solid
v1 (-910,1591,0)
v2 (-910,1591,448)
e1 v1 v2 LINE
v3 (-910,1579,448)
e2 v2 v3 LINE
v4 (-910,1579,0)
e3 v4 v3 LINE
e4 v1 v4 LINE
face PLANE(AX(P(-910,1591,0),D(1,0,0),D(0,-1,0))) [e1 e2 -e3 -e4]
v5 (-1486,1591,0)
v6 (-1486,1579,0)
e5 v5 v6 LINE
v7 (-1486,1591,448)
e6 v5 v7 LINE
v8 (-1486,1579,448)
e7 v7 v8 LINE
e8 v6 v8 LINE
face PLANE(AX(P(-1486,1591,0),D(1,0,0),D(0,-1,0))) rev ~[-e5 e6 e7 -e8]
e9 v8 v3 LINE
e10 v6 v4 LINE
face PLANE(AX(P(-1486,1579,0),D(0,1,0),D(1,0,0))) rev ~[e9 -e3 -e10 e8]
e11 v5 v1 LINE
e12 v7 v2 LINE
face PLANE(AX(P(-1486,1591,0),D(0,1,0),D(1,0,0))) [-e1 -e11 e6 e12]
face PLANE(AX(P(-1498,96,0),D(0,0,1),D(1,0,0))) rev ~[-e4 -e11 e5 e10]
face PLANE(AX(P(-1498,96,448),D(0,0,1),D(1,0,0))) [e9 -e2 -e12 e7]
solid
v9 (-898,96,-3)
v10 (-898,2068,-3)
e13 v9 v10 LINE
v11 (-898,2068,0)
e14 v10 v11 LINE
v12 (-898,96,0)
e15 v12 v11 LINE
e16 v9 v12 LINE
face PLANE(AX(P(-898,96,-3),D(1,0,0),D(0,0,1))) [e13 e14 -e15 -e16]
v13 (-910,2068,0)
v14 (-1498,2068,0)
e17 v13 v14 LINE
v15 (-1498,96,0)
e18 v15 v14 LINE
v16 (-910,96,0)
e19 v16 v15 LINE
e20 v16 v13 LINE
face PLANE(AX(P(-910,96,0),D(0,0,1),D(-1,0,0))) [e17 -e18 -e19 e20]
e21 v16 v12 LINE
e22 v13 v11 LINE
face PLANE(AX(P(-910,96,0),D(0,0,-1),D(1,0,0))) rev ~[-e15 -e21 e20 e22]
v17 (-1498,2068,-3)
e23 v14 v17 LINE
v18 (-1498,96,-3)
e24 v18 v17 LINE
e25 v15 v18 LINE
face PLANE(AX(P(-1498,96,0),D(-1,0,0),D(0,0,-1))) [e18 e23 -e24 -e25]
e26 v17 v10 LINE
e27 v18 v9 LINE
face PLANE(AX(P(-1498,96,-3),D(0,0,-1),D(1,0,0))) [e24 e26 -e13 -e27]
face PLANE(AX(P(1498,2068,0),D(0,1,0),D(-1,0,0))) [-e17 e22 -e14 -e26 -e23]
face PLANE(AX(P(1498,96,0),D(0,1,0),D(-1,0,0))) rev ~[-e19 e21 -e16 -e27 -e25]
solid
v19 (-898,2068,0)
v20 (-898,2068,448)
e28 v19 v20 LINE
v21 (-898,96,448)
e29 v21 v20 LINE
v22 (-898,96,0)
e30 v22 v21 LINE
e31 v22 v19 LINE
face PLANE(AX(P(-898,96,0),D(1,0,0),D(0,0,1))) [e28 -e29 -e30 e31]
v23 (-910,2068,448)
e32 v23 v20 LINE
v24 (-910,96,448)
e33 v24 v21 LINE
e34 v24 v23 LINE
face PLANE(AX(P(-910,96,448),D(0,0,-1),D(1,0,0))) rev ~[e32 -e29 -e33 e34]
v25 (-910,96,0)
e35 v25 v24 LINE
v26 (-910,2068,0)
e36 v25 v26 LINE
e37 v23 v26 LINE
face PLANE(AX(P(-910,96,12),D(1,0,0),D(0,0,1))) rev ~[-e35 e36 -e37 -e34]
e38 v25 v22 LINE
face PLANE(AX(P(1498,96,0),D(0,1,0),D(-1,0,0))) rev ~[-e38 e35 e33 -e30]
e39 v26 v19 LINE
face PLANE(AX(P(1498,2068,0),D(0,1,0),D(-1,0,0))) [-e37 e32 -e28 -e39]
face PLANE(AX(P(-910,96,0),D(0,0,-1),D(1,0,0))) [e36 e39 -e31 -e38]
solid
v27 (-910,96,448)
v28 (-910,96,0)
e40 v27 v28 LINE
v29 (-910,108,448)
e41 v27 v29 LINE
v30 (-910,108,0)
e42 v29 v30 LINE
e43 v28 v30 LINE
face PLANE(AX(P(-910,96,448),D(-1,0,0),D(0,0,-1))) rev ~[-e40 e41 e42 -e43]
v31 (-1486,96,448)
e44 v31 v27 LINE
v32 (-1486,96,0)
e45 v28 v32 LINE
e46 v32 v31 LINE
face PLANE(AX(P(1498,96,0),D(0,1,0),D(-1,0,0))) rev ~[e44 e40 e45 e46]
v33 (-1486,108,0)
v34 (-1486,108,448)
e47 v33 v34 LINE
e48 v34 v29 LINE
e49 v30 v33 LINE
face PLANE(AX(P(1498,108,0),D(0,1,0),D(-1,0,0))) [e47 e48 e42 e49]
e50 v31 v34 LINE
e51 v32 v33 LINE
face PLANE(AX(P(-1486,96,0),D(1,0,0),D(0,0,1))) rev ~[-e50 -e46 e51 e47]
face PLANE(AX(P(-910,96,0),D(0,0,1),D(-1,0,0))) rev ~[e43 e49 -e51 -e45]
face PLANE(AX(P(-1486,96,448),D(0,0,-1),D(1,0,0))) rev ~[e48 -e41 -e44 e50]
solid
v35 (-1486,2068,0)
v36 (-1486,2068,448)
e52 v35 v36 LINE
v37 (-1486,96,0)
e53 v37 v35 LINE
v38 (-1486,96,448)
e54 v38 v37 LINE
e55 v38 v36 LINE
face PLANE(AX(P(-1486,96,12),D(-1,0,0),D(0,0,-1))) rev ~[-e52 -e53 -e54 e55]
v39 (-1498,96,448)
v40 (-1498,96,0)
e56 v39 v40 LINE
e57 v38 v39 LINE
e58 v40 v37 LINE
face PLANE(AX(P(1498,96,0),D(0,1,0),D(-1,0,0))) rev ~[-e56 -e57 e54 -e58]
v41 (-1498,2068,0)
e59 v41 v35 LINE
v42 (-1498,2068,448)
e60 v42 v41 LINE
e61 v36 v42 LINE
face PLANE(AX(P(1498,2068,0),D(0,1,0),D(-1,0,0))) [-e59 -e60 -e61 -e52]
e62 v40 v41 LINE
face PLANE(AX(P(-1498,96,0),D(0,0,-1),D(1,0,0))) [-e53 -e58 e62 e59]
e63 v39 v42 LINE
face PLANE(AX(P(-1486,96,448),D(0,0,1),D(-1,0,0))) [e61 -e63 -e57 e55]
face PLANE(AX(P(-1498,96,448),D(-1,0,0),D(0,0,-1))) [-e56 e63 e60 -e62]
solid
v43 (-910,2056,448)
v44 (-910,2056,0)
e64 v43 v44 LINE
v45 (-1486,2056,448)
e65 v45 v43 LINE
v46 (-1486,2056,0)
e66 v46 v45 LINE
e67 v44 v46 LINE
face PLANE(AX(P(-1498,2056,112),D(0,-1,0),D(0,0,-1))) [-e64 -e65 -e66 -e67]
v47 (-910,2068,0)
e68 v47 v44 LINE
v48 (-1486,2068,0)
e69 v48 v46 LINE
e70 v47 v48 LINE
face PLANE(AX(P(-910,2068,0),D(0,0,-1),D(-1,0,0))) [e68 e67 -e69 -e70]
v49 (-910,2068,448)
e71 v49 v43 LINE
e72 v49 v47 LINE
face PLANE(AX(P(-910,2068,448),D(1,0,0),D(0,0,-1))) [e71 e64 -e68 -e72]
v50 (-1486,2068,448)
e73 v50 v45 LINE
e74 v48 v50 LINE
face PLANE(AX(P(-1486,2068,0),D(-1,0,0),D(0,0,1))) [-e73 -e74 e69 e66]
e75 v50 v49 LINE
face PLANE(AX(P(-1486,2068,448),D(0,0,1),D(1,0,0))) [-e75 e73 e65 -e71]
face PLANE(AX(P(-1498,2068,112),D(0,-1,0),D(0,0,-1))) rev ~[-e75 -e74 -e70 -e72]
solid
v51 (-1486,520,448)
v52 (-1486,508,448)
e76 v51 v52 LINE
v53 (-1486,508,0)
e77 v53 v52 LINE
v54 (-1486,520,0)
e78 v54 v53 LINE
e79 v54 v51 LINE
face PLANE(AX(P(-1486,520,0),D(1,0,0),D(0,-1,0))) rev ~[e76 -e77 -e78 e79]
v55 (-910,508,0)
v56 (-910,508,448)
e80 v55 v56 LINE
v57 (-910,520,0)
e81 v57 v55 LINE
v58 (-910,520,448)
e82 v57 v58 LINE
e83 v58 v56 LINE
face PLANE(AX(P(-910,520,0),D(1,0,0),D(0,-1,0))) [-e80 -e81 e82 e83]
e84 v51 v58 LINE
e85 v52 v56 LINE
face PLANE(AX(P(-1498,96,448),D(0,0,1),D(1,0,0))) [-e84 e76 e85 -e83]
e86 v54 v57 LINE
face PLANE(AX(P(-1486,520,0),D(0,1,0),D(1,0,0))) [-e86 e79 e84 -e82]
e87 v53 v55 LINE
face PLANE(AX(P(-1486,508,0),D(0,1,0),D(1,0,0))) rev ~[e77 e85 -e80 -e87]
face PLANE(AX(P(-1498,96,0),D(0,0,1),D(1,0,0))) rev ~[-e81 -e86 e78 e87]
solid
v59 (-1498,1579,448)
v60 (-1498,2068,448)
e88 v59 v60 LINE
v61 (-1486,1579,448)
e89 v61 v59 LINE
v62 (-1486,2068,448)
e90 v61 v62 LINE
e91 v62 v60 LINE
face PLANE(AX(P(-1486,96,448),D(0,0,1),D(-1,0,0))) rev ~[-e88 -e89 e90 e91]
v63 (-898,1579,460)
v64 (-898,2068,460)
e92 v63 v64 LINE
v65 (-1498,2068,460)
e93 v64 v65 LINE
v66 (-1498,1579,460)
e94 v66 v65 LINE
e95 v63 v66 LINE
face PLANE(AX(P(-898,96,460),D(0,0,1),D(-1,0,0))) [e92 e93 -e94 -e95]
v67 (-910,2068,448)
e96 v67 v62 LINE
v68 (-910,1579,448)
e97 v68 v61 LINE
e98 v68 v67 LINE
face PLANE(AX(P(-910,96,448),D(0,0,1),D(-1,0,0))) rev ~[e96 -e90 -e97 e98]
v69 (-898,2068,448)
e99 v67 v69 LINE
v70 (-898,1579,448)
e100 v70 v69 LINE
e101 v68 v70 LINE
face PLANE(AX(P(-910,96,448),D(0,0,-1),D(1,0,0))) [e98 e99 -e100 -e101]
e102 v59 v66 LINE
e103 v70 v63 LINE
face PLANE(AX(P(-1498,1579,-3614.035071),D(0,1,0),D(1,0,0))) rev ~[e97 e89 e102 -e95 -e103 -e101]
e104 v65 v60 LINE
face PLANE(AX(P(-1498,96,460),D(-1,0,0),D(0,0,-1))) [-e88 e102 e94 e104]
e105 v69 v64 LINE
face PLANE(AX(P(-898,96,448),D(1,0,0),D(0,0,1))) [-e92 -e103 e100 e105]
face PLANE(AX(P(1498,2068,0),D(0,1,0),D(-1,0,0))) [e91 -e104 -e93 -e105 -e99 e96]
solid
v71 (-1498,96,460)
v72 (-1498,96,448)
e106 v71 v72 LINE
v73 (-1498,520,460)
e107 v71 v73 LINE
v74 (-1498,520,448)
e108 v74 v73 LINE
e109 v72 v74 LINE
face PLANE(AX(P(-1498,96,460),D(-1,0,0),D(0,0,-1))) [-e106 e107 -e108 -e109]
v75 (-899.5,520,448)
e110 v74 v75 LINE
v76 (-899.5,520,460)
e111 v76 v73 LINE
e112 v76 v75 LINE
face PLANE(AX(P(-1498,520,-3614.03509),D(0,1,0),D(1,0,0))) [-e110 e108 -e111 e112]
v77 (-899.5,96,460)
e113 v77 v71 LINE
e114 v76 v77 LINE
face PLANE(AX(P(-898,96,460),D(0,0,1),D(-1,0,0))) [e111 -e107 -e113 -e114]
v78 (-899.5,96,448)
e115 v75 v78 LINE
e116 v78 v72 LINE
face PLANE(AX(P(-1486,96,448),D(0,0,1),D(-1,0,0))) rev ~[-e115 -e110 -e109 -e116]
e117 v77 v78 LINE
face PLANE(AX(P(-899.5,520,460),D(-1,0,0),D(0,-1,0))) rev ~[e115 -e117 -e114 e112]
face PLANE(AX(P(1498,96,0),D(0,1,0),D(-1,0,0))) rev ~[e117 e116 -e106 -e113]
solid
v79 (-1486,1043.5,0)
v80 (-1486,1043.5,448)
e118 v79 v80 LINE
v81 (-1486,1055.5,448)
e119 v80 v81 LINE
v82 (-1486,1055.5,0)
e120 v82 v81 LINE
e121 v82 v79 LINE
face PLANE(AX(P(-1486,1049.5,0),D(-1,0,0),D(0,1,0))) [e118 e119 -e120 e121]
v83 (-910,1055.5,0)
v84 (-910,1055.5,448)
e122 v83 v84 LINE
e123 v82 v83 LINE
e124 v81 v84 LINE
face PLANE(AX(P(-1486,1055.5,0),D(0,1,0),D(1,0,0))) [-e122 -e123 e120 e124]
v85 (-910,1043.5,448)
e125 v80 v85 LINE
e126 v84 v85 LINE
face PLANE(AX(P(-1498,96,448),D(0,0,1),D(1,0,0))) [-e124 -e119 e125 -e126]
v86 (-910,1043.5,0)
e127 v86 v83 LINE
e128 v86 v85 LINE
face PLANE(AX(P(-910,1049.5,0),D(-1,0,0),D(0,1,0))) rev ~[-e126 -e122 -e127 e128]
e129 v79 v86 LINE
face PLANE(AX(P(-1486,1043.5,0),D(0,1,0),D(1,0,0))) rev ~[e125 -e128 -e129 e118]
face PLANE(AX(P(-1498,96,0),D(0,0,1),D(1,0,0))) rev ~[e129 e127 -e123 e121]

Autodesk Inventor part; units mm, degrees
ref_plane "YZ Plane" through (0, 0, 0) normal (1, 0, 0) x (0, 1, 0)
sketch "Sketch1" plane through (0, 0, 0) normal (0, 0, 1) x (1, 0, 0)
  line L0 (-1498, 0) -> (1498, 0) construction
  line L1 (-1498, 0) -> (-898, 0)
  line L2 (-898, 0) -> (-898, 2068)
  line L3 (-898, 2068) -> (-1498, 2068)
  line L4 (-1498, 2068) -> (-1498, 0)
  line L5 (-898, 0) -> (-498, 0)
  line L6 (-498, 0) -> (-498, 816)
  line L7 (-498, 816) -> (-898, 816)
  line L8 (-898, 816) -> (-898, 0)
  line L9 (-498, 0) -> (102, 0)
  line L10 (102, 0) -> (102, 816)
  line L11 (102, 816) -> (-498, 816)
  line L12 (-498, 816) -> (-498, 0)
  line L13 (102, 0) -> (698, 0)
  line L14 (698, 0) -> (698, 668)
  line L15 (698, 668) -> (102, 668)
  line L16 (102, 668) -> (102, 0)
  line L17 (698, 0) -> (1498, 0)
  line L18 (1498, 0) -> (1498, 816)
  line L19 (1498, 816) -> (698, 816)
  line L20 (698, 816) -> (698, 0)
  line L21 (-1498, 0) -> (1498, 0)
  line L22 (1498, 0) -> (1498, 96)
  line L23 (1498, 96) -> (-1498, 96)
  line L24 (-1498, 96) -> (-1498, 0)
  line L25 (-898, 816) -> (1498, 816)
  line L26 (1498, 816) -> (1498, 832)
  line L27 (1498, 832) -> (-898, 832)
  line L28 (-898, 832) -> (-898, 816)
  line L29 (-898, 1972) -> (-498, 1972)
  line L30 (-498, 1972) -> (-498, 1372)
  line L31 (-498, 1372) -> (-898, 1372)
  line L32 (-898, 1372) -> (-898, 1972)
  line L33 (698, 1972) -> (1498, 1972)
  line L34 (1498, 1972) -> (1498, 1372)
  line L35 (1498, 1372) -> (698, 1372)
  line L36 (698, 1372) -> (698, 1972)
  line L37 (698, 1372) -> (98, 1372)
  line L38 (98, 1372) -> (98, 1972)
  line L39 (98, 1972) -> (698, 1972)
  line L40 (698, 1972) -> (698, 1372)
  line L41 (-498, 1372) -> (98, 1372)
  line L42 (-498, 1372) -> (-275, 1637.7611)
  line L43 (98, 1372) -> (-125, 1637.7611)
  line L44 (-275, 1637.7611) -> (-125, 1637.7611)
  line L45 (-125, 1637.7611) -> (-125, 2068)
  line L46 (-125, 2068) -> (-275, 2068)
  line L47 (-275, 2068) -> (-275, 1637.7611)
  line L48 (1098, 816) -> (1098, 96)
  line L49 (-198, 816) -> (-198, 96)
  line L50 (-898, 668) -> (-498, 668)
  line L51 (-1498, 520) -> (-898, 520)
  line L52 (-1498, 1579) -> (-898, 1579)
  line L53 (398, 1972) -> (398, 1372)
  line L54 (1098, 1972) -> (1098, 1372)
  line L55 (698, 1876) -> (1498, 1876)
  line L56 (698, 1468) -> (1498, 1468)
  line L57 (-1498, 1049.5) -> (-898, 1049.5)
  point P0 (0, 0)
  point P1 (0, 0)
  point P2 (0, 0)
  point P3 (1098, 816)
  point P4 (-198, 816)
  point P5 (0, 0)
  dimension "d0" = 2996
  dimension "d1" = 600
  dimension "d2" = 2068
  dimension "d3" = 400
  dimension "d4" = 816
  dimension "d5" = 600
  dimension "d6" = 816
  dimension "d7" = 596
  dimension "d8" = 668
  dimension "d9" = 800
  dimension "d10" = 816
  dimension "d11" = 96
  dimension "d12" = 16
  dimension "d13" = 400
  dimension "d14" = 600
  dimension "d15" = 96
  dimension "d16" = 800
  dimension "d17" = 600
  dimension "d18" = 600
  dimension "d19" = 600
  dimension "d20" = 50
  dimension "d21" = 150
  dimension "d22" = 148
  dimension "d23" = 1059
  dimension "d24" = 96
  dimension "d25" = 96
  dimension "d26" = 529.5
ref_plane "Work Plane1" through (1498, 96, 0) normal (0, 1, 0) x (-1, 0, 0)
sketch "Sketch2" plane through (1498, 96, 0) normal (0, 1, 0) x (-1, 0, 0)
  line L0 (2996, 0) -> (2396, 0)
  line L1 (2396, 0) -> (2396, 460)
  line L2 (2396, 460) -> (2996, 460)
  line L3 (2996, 460) -> (2996, 0)
  line L4 (2984, 12) -> (2408, 12)
  line L5 (2408, 12) -> (2408, 448)
  line L6 (2408, 448) -> (2984, 448)
  line L7 (2984, 448) -> (2984, 12)
  line L8 (2984, 12) -> (2984, 0)
  line L9 (2408, 12) -> (2408, 0)
  line L10 (2984, 448) -> (2996, 448)
  line L11 (2408, 448) -> (2396, 448)
  point P0 (1498, 0)
  point P1 (2396, 0)
  point P2 (2396, 0)
  point P3 (2396, 0)
  point P4 (2996, 0)
  dimension "d28" = 460
  dimension "d29" = 12
extrude "Extrusion1" add sketch "Sketch2" along normal up to surface (1972 mm away) contours L0 L8 L7 L10 L3 | L0 L1 L11 L5 L9
extrude "Extrusion2" add sketch "Sketch2" along normal up to surface (1972 mm away) separate body contours L10 L6 L11 L1 L2 L3
split body "Split1" sketch "Sketch1" result two bodies bodies 2 curves L52 first body at (-1098, 1742, 459.5)
split body "Split2" sketch "Sketch1" result one side removed bodies 4 curves L51 removed pieces at (-1298, 1226, 459.5)
sketch "Sketch3" plane through (1498, 96, 0) normal (0, 1, 0) x (-1, 0, 0)
  line L0 (2408, 0) -> (2396, 0) projected
  line L1 (2396, 0) -> (2996, 0)
  line L2 (2996, 0) -> (2996, -3)
  line L3 (2996, -3) -> (2396, -3)
  line L4 (2396, -3) -> (2396, 0)
  point P0 (1498, 0)
  dimension "d34" = 3
extrude "Extrusion3" add sketch "Sketch3" along normal up to surface (1972 mm away) separate body
sketch "Sketch4" plane through (1498, 96, 0) normal (0, 1, 0) x (-1, 0, 0)
  line L0 (2984, 0) -> (2984, 448) projected
  line L1 (2408, 448) -> (2408, 0) projected
  line L2 (2396, 0) -> (2996, 0) projected
  line L3 (2996, 448) -> (2396, 448) projected
  point P0 (1498, 0)
extrude "Extrusion4" add sketch "Sketch4" along normal blind 12 separate body
ref_plane "Work Plane2" through (-1498, 2068, 112) normal (0, -1, 0) x (0, 0, -1)
sketch "Sketch5" plane through (-1498, 2068, 112) normal (0, -1, 0) x (0, 0, -1)
  line L0 (112, 12) -> (-336, 12) projected
  line L1 (-336, 588) -> (112, 588) projected
  line L2 (-336, 0) -> (-336, 600) projected
  line L3 (112, 600) -> (112, 0) projected
  point P0 (112, 1498)
extrude "Extrusion5" add sketch "Sketch5" along normal blind 12 separate body
sketch "Sketch6" plane through (-1498, 96, 0) normal (0, 0, 1) x (1, 0, 0)
  line L0 (0, 1483) -> (600, 1483) projected
  line L1 (0, 953.5) -> (600, 953.5) projected
  line L2 (0, 424) -> (600, 424) projected
  line L3 (0, 1495) -> (600, 1495)
  line L4 (0, 412) -> (600, 412)
  line L5 (0, 959.5) -> (600, 959.5)
  line L6 (0, 947.5) -> (600, 947.5)
  line L7 (12, 0) -> (12, 1972) projected
  line L8 (588, 0) -> (588, 1972) projected
  line L9 (12, 1495) -> (12, 1483)
  line L10 (588, 1495) -> (588, 1483)
  line L11 (12, 959.5) -> (12, 947.5)
  line L12 (588, 959.5) -> (588, 947.5)
  line L13 (588, 424) -> (588, 412)
  line L14 (12, 424) -> (12, 412)
  point P0 (1498, -96)
  dimension "d41" = 12
  dimension "d42" = 12
  dimension "d43" = 6
  dimension "d44" = 6
extrude "Extrusion6" add sketch "Sketch6" along normal up to surface (448 mm away) separate body contours L7 L3 L8 L0 | L5 L8 L1 L7 | L1 L8 L6 L7 | L2 L8 L4 L7
sketch "Sketch8" plane through (-1498, 96, 460) normal (0, 0, 1) x (1, 0, 0)
  line L0 (600, 424) -> (0, 424) projected
  line L1 (600, 424) -> (0, 424) projected
  line L2 (0, 0) -> (0, 424) projected
  line L3 (0, 0) -> (600, 0) projected
  line L4 (600, 0) -> (600, 424) projected
  line L5 (600, 424) -> (598.5, 424)
  line L6 (598.5, 424) -> (598.5, 0)
  line L7 (598.5, 0) -> (600, 0)
  line L8 (600, 0) -> (600, 424)
  point P0 (1498, -96)
  point P1 (598.5, 424)
  point P2 (600, 424)
  dimension "d50" = 1.5
extrude "Extrusion8" cut sketch "Sketch8" against normal blind 12 contours L4 L3 L6 L0 bodies 4
properties part number "Base Cabinet 1"
